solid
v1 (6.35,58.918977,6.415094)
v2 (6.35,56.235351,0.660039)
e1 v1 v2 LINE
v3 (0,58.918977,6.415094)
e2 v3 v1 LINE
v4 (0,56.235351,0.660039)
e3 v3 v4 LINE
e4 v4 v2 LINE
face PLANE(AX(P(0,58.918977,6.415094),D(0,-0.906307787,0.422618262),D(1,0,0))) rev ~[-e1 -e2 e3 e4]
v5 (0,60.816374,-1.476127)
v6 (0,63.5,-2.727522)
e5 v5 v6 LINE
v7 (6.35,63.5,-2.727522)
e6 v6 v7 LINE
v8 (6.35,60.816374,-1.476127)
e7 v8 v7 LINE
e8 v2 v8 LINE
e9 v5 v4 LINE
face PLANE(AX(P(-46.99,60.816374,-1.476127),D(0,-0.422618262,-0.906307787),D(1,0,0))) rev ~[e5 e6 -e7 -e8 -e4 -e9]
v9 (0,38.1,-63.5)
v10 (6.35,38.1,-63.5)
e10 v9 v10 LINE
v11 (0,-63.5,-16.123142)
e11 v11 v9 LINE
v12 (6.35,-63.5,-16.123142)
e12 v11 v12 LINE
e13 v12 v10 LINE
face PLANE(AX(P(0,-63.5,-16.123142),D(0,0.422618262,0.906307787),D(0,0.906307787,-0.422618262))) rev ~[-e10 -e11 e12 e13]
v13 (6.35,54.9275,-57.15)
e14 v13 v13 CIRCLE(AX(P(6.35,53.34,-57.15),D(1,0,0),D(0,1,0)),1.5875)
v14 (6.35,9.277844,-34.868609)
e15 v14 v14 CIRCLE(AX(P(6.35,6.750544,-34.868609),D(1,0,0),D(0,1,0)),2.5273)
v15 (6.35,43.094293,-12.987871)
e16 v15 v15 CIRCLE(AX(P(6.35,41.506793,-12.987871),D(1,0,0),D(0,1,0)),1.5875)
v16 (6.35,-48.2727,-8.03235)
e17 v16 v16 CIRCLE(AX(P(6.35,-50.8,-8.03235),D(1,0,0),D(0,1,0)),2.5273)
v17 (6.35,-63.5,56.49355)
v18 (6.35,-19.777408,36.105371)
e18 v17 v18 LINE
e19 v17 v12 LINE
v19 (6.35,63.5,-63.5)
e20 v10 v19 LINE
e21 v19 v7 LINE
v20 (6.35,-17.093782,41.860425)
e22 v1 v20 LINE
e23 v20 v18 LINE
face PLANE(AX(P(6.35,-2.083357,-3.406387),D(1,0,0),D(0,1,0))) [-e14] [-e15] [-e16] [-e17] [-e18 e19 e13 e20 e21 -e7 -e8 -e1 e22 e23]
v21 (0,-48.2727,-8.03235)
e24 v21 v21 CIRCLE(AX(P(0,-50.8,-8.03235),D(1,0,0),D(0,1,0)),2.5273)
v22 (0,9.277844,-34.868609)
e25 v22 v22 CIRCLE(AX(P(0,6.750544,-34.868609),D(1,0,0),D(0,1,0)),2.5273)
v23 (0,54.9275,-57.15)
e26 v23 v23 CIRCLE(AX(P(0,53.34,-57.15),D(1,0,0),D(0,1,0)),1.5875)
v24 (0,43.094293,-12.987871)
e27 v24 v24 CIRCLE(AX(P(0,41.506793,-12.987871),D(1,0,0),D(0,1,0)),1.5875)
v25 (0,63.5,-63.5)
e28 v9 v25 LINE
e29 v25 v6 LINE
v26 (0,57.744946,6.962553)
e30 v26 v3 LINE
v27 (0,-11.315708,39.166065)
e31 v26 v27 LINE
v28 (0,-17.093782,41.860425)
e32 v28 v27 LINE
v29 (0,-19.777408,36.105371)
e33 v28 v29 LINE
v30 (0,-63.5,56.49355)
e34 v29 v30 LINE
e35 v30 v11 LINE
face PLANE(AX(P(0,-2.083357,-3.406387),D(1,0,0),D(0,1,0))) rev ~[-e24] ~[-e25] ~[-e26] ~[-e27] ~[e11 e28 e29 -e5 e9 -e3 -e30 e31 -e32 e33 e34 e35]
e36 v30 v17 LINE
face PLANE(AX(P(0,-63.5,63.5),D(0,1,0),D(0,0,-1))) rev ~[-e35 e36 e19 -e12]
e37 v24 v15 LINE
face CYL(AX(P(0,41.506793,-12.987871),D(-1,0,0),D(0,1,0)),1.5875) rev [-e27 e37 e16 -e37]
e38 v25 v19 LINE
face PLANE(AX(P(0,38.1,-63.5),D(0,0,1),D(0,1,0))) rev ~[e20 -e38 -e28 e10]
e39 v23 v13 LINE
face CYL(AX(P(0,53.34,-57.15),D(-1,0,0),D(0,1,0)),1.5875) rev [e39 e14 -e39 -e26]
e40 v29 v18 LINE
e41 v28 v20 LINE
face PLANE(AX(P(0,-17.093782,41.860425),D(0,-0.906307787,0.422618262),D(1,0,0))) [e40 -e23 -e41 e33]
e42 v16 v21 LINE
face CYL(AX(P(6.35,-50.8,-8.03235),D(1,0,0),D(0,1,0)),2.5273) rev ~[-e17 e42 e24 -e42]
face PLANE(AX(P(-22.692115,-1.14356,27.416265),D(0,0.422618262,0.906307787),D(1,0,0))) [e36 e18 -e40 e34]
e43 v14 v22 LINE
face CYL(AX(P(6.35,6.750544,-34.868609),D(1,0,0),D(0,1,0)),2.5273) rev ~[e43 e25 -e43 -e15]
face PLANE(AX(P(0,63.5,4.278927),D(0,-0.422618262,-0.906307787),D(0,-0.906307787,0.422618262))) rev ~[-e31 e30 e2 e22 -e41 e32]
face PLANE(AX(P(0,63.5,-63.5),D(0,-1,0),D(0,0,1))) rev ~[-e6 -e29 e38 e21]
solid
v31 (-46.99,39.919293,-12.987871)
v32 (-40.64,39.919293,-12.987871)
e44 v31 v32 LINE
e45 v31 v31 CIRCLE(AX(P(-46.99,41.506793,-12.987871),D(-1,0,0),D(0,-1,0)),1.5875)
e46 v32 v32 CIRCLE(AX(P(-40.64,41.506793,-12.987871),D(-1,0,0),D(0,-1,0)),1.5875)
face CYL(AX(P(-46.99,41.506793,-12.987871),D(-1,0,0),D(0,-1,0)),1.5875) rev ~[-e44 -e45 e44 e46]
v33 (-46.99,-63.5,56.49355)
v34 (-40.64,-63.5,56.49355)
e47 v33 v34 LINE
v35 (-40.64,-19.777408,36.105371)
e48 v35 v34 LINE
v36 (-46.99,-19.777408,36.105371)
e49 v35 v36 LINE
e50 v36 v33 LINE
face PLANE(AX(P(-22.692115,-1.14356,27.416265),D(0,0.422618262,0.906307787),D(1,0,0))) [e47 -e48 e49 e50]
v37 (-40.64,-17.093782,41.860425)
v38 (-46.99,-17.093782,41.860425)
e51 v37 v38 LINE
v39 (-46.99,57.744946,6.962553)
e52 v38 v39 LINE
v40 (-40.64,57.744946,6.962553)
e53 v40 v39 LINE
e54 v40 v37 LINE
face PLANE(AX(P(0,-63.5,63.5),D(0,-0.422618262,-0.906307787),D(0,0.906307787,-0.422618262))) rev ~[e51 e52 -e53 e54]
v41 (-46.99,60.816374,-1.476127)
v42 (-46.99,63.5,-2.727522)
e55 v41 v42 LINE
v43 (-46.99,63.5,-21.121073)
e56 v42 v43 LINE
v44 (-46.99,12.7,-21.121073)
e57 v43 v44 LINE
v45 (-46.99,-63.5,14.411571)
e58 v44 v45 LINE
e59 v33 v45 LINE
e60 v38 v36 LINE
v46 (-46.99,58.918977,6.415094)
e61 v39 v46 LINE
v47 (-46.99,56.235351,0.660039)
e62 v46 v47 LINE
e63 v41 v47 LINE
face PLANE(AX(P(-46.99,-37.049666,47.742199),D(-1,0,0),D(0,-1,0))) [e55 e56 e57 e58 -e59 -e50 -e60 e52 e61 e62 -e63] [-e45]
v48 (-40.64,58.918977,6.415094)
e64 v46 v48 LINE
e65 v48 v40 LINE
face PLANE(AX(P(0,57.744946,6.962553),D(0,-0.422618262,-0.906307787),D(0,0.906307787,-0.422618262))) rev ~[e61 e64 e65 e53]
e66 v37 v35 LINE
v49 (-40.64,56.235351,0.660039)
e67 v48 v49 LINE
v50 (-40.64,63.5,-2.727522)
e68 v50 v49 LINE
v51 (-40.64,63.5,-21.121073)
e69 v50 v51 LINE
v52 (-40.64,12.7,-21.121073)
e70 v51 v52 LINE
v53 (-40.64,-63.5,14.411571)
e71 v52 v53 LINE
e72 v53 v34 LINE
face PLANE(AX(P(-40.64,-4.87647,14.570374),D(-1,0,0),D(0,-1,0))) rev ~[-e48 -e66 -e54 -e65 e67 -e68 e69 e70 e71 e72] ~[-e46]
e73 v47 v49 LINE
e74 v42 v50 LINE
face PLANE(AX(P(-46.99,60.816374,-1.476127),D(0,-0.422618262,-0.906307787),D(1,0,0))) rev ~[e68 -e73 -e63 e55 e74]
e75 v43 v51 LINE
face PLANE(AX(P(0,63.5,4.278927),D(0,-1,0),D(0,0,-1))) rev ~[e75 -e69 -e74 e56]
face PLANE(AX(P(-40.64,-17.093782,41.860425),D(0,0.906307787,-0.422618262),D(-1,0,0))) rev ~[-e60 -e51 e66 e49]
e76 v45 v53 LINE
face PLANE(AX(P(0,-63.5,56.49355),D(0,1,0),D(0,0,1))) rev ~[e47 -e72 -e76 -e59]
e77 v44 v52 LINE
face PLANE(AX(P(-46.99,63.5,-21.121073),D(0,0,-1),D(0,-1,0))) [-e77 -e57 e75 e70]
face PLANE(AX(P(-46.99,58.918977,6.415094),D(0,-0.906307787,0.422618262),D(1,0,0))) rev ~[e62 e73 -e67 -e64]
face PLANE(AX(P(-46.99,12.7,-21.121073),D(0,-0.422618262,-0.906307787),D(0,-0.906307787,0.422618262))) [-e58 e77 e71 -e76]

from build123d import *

# Parameters (mm, degrees)
F0_R       = 1.5875
F1_DEPTH   = 6.35
F3_DEPTH   = 46.99
F4_R       = 1.5875
F5_DEPTH   = 6.35
F6_W       = 3.81
F6_H       = 76.2
F7_DEPTH   = 6.35
F8_R       = 2.5273
F9_DEPTH   = 6.35
F10_W      = 6.35
F10_H      = 5.0546
F10_H_2    = 51.2035957082
F11_DEPTH  = 6.35
F11_FACE_W = 6.35
F11_FACE_H = 6.35
F12_DEPTH  = 28.6456124865


with BuildPart() as f1:
    # F0 (on Right) → F1 (new body)
    with BuildSketch(Plane.YZ):
        Polygon((63.5, -63.5), (63.5, 4.2789274143), (-63.5, 63.5), (-63.5, -16.1231419315), (38.1, -63.5), align=None)
        with Locations((53.34, -57.15)):
            Circle(F0_R, mode=Mode.SUBTRACT)
        with Locations((41.5067932579, -12.9878712221)):
            Circle(F0_R, mode=Mode.SUBTRACT)
    extrude(amount=F1_DEPTH)

    # F8 (on face) → F9 (cut, through all)
    with BuildSketch(Plane.YZ.offset(6.35)):
        with Locations((-50.8, -8.0323496192)):
            Circle(F8_R)
        with Locations((6.7505444768, -34.8686092397)):
            Circle(F8_R)
    extrude(amount=-F9_DEPTH, mode=Mode.SUBTRACT)


with BuildPart() as f3:
    # F2 (on face) → F3 (new body)
    with BuildSketch(Plane(origin=(0, 0, 0), x_dir=(0, -1, 0), z_dir=(-1, 0, 0))):
        Polygon((11.7045099709, 32.3409165561), (63.5, 56.4935502146), (63.5, 63.5), (9.0208840088, 38.0959710038), align=None)
        Polygon((-63.5, -2.7275223711), (-55.0613195903, 1.2074989287), (-57.7449455523, 6.9625533764), (-63.5, 4.2789274143), align=None)
        Polygon((-55.0613195903, 1.2074989287), (11.7045099709, 32.3409165561), (9.0208840088, 38.0959710038), (-57.7449455523, 6.9625533764), align=None)
    extrude(amount=F3_DEPTH)

    # F4 (on face) → F5 (join)
    with BuildSketch(Plane(origin=(-46.99, 0, 0), x_dir=(0, -1, 0), z_dir=(-1, 0, 0))):
        Polygon((63.5, 63.5), (-63.5, 4.2789274143), (-63.5, -21.1210725857), (-12.7, -21.1210725857), (63.5, 14.4115709657), align=None)
        with Locations((-41.5067932579, -12.9878712221)):
            Circle(F4_R, mode=Mode.SUBTRACT)
    extrude(amount=-F5_DEPTH)

    # F6 (on face) → F7 (cut, through all)
    with BuildSketch(Plane(origin=(0, 12.9804176766, 27.8365955385), x_dir=(1, 0, 0), z_dir=(0, 0.4226182617, 0.906307787))):
        with Locations((-1.905, 11.2921916109)):
            Rectangle(F6_W, F6_H)
        with Locations((-38.735, 11.2921916109)):
            Rectangle(F6_W, F6_H)
    extrude(amount=-F7_DEPTH, mode=Mode.SUBTRACT)


with BuildPart() as f11_tool:
    # F10 (on face) → F11 (new body)
    with BuildSketch(Plane(origin=(0, 12.9804176766, 27.8365955385), x_dir=(1, 0, 0), z_dir=(0, 0.4226182617, 0.906307787))):
        Polygon((-3.81, 49.3921916109), (0, 49.3921916109), (0, 50.6875916109), (0, 55.7421916109), (-46.99, 55.7421916109), (-46.99, 50.6875916109), (-40.64, 50.6875916109), (-40.64, 49.3921916109), (-36.83, 49.3921916109), (-36.83, -26.8078083891), (-40.64, -26.8078083891), (-40.64, -33.1832083891), (-46.99, -33.1832083891), (-46.99, -84.3868040974), (0, -84.3868040974), (0, -33.1832083891), (0, -26.8078083891), (-3.81, -26.8078083891), align=None)
        with Locations((3.175, 53.2148916109)):
            Rectangle(F10_W, F10_H)
        with Locations((3.175, -58.7850062432)):
            Rectangle(F10_W, F10_H_2)
    extrude(amount=-F11_DEPTH)


with BuildPart() as f1_1:
    add(f1.part)

    # F11: cut by f11_tool
    add(f11_tool.part, mode=Mode.SUBTRACT)


with BuildPart() as f3_1:
    add(f3.part)

    # F11: cut by f11_tool
    add(f11_tool.part, mode=Mode.SUBTRACT)


with BuildPart() as f12_tool:
    # F11_face (on face) + F11_face1 (on face) → F12 (new body, through all)
    with BuildSketch(Plane(origin=(3.175, 62.158187019, 1.4014001905), x_dir=(1, 0, 0), z_dir=(0, -0.906307787, 0.4226182617))):
        Rectangle(F11_FACE_W, F11_FACE_H)
    with BuildSketch(Plane(origin=(-23.495, 62.158187019, 1.4014001905), x_dir=(1, 0, 0), z_dir=(0, -0.906307787, 0.4226182617))):
        Polygon((23.495, 3.175), (-23.495, 3.175), (-23.495, -3.175), (-17.145, -3.175), (23.495, -3.175), align=None)
    extrude(amount=-F12_DEPTH)


with BuildPart() as f1_2:
    add(f1_1.part)

    # F12: cut by f12_tool
    add(f12_tool.part, mode=Mode.SUBTRACT)


with BuildPart() as f3_2:
    add(f3_1.part)

    # F12: cut by f12_tool
    add(f12_tool.part, mode=Mode.SUBTRACT)


solid = Compound([f1_2.part, f3_2.part])
